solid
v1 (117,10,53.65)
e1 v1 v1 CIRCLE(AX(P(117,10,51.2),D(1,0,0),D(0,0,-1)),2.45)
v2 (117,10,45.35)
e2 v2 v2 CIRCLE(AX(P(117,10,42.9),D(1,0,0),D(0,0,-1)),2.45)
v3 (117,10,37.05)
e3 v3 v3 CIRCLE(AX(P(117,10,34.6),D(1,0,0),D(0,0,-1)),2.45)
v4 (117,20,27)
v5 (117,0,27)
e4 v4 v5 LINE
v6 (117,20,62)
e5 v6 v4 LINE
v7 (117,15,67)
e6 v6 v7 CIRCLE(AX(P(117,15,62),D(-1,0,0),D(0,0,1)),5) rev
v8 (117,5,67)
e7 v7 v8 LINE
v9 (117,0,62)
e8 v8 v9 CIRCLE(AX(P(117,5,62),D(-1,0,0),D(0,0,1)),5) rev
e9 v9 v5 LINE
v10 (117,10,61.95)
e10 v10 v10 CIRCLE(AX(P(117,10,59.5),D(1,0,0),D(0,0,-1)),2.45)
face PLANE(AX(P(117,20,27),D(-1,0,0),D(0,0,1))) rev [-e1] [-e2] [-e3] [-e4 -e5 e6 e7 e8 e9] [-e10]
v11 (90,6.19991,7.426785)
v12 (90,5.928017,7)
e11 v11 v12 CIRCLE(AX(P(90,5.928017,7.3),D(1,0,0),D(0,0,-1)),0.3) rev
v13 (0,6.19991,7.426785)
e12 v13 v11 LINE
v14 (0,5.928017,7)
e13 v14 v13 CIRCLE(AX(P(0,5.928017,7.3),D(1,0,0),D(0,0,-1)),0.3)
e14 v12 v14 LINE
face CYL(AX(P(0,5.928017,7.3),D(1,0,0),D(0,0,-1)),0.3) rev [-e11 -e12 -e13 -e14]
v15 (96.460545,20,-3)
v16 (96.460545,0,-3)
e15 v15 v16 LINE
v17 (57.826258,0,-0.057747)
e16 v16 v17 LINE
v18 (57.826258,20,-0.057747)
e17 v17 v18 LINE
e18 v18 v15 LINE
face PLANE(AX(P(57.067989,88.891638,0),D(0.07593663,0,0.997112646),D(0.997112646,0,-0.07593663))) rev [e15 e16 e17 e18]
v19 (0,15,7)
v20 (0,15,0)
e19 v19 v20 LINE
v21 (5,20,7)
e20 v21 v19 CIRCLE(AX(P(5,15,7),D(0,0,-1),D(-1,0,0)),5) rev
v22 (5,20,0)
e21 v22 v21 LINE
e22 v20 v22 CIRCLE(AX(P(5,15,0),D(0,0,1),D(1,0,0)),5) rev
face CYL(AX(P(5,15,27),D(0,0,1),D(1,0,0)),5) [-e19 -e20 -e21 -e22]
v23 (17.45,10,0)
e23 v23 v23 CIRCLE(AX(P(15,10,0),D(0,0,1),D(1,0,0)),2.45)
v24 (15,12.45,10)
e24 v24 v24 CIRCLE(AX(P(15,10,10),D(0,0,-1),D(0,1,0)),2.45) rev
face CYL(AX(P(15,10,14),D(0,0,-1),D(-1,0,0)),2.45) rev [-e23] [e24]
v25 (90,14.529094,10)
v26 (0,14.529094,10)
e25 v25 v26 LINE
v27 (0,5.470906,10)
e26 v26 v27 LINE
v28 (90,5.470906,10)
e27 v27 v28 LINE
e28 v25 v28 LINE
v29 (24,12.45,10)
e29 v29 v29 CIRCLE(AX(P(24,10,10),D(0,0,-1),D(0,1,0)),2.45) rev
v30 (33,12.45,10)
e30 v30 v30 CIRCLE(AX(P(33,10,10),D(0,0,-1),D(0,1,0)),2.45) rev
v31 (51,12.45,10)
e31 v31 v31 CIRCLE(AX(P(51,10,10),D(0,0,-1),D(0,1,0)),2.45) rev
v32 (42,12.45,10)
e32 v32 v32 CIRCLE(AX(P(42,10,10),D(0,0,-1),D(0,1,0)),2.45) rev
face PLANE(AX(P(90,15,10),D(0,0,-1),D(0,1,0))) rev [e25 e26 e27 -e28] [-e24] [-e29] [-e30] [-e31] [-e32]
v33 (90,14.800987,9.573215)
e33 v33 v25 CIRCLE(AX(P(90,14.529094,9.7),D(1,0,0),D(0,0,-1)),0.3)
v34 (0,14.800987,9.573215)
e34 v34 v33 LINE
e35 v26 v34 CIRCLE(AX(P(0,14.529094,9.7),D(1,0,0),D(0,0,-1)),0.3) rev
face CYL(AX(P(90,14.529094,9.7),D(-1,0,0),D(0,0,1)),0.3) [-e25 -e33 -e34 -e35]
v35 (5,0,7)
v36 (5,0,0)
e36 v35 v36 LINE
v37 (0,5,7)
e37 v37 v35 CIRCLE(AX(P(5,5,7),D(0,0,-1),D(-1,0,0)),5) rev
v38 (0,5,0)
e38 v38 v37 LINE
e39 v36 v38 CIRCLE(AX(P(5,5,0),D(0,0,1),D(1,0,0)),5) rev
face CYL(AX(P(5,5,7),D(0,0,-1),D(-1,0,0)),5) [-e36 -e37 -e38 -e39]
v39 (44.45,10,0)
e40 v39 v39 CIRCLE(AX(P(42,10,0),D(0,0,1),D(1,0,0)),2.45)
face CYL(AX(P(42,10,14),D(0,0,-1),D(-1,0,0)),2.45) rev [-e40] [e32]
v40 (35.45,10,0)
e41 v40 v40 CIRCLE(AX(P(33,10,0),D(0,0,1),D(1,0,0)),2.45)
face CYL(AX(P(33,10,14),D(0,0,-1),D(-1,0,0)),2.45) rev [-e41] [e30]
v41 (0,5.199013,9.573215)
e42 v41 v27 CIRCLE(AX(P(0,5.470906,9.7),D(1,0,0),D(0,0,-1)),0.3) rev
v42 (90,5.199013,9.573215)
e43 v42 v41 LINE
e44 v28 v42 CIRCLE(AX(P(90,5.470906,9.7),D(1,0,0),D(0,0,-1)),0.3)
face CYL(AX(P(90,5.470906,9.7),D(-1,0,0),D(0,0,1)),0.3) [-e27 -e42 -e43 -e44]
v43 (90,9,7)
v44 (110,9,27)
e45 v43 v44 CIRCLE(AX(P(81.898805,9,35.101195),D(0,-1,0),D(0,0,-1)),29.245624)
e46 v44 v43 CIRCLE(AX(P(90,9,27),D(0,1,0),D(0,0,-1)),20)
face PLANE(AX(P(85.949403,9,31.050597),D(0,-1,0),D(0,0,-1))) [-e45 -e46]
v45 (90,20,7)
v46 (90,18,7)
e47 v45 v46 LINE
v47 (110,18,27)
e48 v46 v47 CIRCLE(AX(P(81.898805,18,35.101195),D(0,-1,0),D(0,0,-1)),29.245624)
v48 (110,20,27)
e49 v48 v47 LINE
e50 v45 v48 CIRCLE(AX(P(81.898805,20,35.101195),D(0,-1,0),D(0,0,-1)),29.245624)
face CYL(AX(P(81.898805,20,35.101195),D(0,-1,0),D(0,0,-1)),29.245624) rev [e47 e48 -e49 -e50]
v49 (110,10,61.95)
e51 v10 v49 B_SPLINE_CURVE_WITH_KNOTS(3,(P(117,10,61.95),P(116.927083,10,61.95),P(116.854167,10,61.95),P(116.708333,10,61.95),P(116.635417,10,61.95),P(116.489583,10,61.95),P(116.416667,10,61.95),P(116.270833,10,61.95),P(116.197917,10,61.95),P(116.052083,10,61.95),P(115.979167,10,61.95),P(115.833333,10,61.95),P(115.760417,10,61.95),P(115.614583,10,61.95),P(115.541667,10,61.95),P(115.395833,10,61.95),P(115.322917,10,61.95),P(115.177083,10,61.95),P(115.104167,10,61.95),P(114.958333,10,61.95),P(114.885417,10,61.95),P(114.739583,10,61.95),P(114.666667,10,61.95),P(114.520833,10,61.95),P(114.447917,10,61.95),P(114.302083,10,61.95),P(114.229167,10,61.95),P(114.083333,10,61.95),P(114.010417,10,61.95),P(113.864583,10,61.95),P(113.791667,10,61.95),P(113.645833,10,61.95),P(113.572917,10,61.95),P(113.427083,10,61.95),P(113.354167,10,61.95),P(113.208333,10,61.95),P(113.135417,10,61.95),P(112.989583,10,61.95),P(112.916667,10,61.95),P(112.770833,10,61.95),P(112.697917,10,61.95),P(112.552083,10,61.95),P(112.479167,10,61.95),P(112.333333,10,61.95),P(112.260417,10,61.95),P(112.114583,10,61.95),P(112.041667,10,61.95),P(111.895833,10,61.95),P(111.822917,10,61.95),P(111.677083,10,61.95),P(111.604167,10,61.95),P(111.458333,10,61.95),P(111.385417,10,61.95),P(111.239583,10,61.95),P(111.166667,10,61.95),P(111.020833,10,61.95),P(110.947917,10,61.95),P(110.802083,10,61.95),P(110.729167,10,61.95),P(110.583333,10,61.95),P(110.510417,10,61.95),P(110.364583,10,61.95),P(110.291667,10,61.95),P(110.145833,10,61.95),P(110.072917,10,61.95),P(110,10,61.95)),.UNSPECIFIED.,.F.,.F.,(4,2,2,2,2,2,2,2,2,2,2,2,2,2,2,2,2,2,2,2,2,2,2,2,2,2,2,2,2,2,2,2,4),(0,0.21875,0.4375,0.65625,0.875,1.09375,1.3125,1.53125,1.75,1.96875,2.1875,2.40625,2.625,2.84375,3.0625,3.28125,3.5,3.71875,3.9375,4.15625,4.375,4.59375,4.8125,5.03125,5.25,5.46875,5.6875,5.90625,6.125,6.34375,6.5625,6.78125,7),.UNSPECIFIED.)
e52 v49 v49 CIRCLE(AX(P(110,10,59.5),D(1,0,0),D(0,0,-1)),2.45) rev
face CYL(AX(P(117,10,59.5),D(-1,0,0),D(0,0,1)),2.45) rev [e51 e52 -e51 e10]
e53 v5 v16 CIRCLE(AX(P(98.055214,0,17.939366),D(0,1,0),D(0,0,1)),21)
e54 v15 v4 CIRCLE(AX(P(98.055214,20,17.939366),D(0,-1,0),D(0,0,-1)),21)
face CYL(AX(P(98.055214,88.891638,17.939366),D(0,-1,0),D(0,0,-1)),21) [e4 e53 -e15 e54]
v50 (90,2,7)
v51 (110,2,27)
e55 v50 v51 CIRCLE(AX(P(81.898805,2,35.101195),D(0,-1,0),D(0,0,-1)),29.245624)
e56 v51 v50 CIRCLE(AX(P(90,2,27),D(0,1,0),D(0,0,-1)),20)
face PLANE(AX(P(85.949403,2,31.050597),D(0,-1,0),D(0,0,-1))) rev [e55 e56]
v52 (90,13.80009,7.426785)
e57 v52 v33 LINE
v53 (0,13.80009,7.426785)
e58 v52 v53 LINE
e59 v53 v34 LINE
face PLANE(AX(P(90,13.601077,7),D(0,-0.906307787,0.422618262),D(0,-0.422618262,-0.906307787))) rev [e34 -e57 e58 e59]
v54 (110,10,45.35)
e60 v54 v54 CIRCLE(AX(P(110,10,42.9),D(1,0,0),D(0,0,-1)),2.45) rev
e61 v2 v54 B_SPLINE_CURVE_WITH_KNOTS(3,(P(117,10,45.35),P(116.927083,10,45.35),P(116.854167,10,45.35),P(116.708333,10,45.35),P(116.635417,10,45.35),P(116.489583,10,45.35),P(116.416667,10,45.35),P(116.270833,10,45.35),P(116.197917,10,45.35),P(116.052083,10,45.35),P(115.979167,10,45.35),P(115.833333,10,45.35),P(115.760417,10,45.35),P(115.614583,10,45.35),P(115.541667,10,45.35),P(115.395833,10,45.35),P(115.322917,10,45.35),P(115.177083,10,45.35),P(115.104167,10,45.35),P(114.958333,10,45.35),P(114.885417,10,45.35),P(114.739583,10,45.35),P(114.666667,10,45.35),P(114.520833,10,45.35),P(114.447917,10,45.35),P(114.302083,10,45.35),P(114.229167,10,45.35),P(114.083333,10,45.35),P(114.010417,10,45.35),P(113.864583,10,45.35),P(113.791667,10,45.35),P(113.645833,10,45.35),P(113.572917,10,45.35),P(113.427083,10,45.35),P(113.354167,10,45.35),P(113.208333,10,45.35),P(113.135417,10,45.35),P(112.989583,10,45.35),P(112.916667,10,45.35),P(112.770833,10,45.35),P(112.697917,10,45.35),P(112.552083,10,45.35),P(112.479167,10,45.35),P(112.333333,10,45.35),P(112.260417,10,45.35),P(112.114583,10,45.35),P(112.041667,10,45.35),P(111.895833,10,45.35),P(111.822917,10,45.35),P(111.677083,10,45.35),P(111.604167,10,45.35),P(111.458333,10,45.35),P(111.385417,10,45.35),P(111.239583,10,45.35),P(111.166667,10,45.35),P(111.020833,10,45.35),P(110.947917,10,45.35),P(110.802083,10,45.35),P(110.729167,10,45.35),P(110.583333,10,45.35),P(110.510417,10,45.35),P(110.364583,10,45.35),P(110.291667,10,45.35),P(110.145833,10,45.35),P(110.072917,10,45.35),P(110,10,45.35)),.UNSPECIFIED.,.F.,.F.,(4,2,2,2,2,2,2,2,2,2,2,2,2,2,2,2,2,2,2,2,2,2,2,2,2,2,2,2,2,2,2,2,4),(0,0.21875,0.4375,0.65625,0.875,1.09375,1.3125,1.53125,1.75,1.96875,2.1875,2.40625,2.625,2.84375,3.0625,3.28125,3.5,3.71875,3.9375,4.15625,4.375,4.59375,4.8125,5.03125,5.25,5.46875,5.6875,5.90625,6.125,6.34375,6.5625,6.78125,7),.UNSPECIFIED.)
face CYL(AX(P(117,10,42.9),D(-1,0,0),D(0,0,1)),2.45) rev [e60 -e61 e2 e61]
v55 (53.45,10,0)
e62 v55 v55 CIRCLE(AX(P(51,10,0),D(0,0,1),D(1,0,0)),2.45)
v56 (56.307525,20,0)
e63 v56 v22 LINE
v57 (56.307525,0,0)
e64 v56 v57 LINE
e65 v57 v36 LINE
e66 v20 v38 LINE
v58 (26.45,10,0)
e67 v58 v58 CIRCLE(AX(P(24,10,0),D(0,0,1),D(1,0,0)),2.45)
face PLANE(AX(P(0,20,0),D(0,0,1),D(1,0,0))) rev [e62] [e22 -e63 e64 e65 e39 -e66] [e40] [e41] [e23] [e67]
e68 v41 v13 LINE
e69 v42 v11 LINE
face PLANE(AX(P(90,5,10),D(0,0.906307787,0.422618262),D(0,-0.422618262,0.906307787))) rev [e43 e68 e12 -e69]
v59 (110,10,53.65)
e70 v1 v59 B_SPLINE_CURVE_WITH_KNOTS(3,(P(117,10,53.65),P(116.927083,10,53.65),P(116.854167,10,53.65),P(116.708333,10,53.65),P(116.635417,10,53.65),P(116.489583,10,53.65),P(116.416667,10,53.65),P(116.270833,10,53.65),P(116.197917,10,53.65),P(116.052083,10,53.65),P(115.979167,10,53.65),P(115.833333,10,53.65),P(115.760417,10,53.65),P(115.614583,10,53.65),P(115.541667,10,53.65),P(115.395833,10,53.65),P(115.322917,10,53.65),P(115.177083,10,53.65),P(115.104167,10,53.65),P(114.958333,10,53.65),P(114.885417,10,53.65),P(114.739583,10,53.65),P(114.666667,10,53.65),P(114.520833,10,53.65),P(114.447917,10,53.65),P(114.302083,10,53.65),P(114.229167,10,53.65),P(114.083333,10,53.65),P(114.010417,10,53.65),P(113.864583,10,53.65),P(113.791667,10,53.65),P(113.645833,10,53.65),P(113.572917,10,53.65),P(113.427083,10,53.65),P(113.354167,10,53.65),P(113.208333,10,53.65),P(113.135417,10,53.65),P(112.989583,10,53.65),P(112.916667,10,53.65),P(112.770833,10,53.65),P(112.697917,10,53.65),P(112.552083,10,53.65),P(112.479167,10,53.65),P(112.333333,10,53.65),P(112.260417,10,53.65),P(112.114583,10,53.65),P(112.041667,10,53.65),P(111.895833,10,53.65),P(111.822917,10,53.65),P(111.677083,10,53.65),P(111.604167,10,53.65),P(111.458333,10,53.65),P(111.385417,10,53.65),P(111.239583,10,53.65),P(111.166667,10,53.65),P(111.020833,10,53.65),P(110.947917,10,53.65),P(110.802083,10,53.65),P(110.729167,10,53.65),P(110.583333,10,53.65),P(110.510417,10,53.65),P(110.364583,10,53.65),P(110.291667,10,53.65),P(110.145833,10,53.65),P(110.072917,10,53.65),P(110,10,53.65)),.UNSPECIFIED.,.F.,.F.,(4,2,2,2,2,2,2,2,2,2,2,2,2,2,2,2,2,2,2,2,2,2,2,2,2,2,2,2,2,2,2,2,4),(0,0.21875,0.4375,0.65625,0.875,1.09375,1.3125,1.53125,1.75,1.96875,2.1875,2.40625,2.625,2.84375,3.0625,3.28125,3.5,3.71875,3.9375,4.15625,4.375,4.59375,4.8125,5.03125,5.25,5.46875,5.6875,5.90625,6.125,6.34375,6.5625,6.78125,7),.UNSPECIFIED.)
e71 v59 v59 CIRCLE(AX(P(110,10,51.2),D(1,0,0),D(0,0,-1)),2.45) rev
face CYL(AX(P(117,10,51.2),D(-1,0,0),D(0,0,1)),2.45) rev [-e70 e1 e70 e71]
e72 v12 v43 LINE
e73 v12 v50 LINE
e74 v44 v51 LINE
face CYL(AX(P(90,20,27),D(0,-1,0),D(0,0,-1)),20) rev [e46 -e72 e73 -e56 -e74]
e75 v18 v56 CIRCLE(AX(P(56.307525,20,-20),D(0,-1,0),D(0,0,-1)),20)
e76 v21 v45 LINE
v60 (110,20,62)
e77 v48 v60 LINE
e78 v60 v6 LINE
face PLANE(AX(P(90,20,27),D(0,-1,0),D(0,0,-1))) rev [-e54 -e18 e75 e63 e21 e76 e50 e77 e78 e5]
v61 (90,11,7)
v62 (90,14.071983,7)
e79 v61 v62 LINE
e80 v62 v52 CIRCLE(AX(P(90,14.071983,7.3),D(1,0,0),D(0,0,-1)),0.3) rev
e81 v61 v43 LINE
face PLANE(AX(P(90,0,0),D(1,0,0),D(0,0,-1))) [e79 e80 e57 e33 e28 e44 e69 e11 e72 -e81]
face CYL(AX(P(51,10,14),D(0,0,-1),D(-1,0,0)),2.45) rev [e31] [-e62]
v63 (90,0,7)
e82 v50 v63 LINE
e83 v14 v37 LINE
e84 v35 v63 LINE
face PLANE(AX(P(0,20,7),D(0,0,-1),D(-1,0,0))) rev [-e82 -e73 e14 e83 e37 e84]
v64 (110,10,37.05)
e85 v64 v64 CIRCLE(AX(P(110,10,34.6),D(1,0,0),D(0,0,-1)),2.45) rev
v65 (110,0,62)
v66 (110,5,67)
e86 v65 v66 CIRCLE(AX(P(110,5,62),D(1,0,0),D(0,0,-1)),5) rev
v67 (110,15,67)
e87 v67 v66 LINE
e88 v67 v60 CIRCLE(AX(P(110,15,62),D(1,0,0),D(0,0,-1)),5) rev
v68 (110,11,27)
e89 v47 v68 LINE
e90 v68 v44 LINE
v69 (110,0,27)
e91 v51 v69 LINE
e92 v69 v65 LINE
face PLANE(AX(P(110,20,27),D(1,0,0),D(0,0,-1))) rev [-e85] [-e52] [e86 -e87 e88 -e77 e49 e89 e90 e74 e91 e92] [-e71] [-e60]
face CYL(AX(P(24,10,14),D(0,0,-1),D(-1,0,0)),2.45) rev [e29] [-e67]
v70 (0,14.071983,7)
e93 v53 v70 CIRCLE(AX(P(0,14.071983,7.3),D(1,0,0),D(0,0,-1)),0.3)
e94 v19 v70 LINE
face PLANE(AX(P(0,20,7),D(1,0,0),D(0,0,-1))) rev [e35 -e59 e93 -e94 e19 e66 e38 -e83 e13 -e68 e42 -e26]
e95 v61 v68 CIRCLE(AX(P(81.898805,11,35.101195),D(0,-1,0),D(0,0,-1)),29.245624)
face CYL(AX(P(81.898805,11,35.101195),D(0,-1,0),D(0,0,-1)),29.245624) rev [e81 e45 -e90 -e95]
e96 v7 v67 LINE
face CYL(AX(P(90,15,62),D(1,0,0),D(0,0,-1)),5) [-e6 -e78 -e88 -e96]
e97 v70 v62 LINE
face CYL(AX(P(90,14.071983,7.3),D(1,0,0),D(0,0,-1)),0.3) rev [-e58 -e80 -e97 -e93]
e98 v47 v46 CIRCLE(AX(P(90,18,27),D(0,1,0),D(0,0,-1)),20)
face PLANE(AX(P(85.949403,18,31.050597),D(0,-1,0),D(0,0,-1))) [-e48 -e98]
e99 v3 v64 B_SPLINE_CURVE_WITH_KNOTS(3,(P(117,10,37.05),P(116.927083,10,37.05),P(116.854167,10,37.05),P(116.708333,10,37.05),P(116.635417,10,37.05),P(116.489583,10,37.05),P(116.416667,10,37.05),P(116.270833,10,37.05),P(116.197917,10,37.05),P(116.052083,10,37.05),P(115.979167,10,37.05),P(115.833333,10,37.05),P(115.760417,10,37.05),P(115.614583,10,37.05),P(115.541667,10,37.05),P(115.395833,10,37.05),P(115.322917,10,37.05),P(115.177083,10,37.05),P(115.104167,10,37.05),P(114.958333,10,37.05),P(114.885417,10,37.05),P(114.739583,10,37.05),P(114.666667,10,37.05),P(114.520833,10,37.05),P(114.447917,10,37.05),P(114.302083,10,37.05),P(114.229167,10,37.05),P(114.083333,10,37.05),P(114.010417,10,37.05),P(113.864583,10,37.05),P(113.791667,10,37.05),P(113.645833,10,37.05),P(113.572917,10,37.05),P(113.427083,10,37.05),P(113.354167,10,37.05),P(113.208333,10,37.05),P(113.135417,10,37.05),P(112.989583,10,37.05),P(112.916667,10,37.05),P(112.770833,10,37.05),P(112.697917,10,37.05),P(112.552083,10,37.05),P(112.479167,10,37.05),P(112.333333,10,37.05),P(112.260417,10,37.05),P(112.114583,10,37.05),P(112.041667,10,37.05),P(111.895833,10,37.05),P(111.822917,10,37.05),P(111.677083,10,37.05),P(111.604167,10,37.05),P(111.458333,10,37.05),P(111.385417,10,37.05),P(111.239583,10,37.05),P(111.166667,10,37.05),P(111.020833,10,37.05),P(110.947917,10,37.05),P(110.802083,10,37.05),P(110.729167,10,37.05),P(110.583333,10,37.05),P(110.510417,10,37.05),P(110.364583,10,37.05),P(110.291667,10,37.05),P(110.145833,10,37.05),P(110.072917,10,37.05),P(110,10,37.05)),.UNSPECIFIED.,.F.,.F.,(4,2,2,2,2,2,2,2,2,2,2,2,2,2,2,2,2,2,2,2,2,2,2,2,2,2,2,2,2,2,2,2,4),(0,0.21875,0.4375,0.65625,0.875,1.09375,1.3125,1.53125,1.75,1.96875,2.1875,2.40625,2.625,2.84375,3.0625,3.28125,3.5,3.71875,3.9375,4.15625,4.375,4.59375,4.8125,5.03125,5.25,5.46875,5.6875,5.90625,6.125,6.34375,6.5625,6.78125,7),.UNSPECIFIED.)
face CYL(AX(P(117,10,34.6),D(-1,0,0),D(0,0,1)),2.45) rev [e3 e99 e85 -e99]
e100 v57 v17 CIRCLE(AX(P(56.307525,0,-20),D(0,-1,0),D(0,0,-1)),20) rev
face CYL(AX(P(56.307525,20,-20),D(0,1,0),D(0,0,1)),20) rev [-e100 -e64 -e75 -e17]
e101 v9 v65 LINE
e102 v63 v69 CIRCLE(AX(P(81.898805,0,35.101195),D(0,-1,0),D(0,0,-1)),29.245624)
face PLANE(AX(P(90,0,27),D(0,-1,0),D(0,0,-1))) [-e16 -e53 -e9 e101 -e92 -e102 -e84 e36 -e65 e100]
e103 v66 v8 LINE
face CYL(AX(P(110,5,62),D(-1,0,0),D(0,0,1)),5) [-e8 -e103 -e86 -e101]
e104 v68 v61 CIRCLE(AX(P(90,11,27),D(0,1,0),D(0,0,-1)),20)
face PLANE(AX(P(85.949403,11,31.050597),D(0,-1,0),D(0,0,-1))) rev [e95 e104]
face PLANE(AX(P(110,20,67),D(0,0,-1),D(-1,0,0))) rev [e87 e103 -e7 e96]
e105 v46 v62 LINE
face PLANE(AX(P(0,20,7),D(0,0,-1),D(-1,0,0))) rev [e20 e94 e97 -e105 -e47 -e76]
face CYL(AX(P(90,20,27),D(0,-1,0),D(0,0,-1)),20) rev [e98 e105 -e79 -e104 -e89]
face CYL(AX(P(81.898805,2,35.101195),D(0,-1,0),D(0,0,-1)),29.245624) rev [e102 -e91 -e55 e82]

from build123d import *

# Parameters (mm, degrees)
BOSS_EXTRUDE1_DEPTH = 20
BOSS_EXTRUDE2_DEPTH = 90
SKETCH4_R           = 2.45
CUT_EXTRUDE1_DEPTH  = 137.301137193
LPATTERN1_COUNT     = 4
LPATTERN1_PITCH     = 8.3
SKETCH5_R           = 2.45
CUT_EXTRUDE2_DEPTH  = 14
LPATTERN2_COUNT     = 5
LPATTERN2_PITCH     = 9
FILLET2_R           = 5
BOSS_EXTRUDE4_DEPTH = 20
BOSS_EXTRUDE5_DEPTH = 2
LPATTERN3_COUNT     = 3
LPATTERN3_PITCH     = 9
FILLET3_R           = 0.3
FILLET4_R           = 20


with BuildPart() as part:
    # Sketch1 → Boss-Extrude1 (new body)
    with BuildSketch(Plane(origin=(0, 0, 0), x_dir=(1, 0, 0), z_dir=(0, 1, 0))):
        with BuildLine():
            Line((0, 0), (90, 0))
            ThreePointArc((90, 0), (109.091883092, -7.908116908), (117, -27))
            Line((117, -27), (117, -67))
            Line((117, -67), (110, -67))
            Line((110, -67), (110, -27))
            ThreePointArc((110, -27), (104.142135624, -12.857864376), (90, -7))
            Line((90, -7), (0, -7))
            Line((0, -7), (0, 0))
        make_face()
    extrude(amount=BOSS_EXTRUDE1_DEPTH)

    # Sketch2 → Boss-Extrude2 (add)
    with BuildSketch(Plane(origin=(0, 0, 0), x_dir=(0, 0, -1), z_dir=(1, 0, 0))):
        Polygon((-10, 15), (-10, 5), (-7, 6.398922974), (-7, 13.601077026), align=None)
    extrude(amount=BOSS_EXTRUDE2_DEPTH)

    # Sketch4 → Cut-Extrude1 (cut, through all)
    with BuildSketch(Plane(origin=(0, 0, 0), x_dir=(0, 0, -1), z_dir=(1, 0, 0))):
        with Locations(Location((-59.5, 10, 0), (0, 0, 180))):
            Circle(SKETCH4_R)
    cut_extrude1 = extrude(amount=CUT_EXTRUDE1_DEPTH, mode=Mode.SUBTRACT)

    # LPattern1: Cut-Extrude1 ×4
    with Locations(*[(0, 0, -i * LPATTERN1_PITCH) for i in range(1, LPATTERN1_COUNT)]):
        add(cut_extrude1, mode=Mode.SUBTRACT)

    # Sketch5 → Cut-Extrude2 (cut)
    with BuildSketch(Plane.XY):
        with Locations(Location((15, 10, 0), (0, 0, 90))):
            Circle(SKETCH5_R)
    cut_extrude2 = extrude(amount=CUT_EXTRUDE2_DEPTH, mode=Mode.SUBTRACT)

    # LPattern2: Cut-Extrude2 ×5
    with Locations(*[(i * LPATTERN2_PITCH, 0, 0) for i in range(1, LPATTERN2_COUNT)]):
        add(cut_extrude2, mode=Mode.SUBTRACT)

    # Fillet2
    fillet2_edges = [part.edges().sort_by_distance(p)[0] for p in [
        (0, 0, 3.5),
        (113.5, 20, 67),
        (0, 20, 3.5),
        (113.5, 0, 67),
    ]]
    fillet(fillet2_edges, radius=FILLET2_R)

    # Sketch6 → Boss-Extrude4 (add)
    with BuildSketch(Plane(origin=(0, 0, 0), x_dir=(1, 0, 0), z_dir=(0, 1, 0))):
        with BuildLine():
            Line((57.067989457, 0), (96.460545107, 3))
            ThreePointArc((96.460545107, 3), (115.383129249, -6.075834674), (117, -27))
            ThreePointArc((117, -27), (109.091883092, -7.908116908), (90, 0))
            Line((90, 0), (57.067989457, 0))
        make_face()
    extrude(amount=BOSS_EXTRUDE4_DEPTH)

    # Sketch8 → Boss-Extrude5 (add)
    with BuildSketch(Plane(origin=(0, 0, 0), x_dir=(1, 0, 0), z_dir=(0, 1, 0))):
        with BuildLine():
            ThreePointArc((90, -7), (102.578584062, -14.421415938), (110, -27))
            ThreePointArc((110, -27), (104.142135624, -12.857864376), (90, -7))
        make_face()
    boss_extrude5 = extrude(amount=BOSS_EXTRUDE5_DEPTH)

    # LPattern3: Boss-Extrude5 ×3
    with Locations(*[(0, i * LPATTERN3_PITCH, 0) for i in range(1, LPATTERN3_COUNT)]):
        add(boss_extrude5)

    # Fillet3
    fillet3_edges = [part.edges().sort_by_distance(p)[0] for p in [
        (45, 13.601077026, 7),
        (45, 15, 10),
        (45, 5, 10),
        (45, 6.398922974, 7),
    ]]
    fillet(fillet3_edges, radius=FILLET3_R)

    # Fillet4
    # the kernel refuses this fillet: 20 mm, written as the material it adds along each edge
    with BuildSketch(Plane(origin=(57.067989457, 0, 0), x_dir=(0.9971126456779296, 0, -0.07593663035162816), z_dir=(0, 1, 0))) as fillet4_piece_1:
        with BuildLine():
            CenterArc((FILLET4_R * 0.0380232084134, FILLET4_R), FILLET4_R, 265.644959248, 4.355040752)
            Line((-FILLET4_R * 0.0379134219382, FILLET4_R * 0.00288735432207), (0, 0))
            Line((0, 0), (FILLET4_R * 0.0380232084134, 0))
        make_face()
    extrude(amount=20)


solid = part.part
